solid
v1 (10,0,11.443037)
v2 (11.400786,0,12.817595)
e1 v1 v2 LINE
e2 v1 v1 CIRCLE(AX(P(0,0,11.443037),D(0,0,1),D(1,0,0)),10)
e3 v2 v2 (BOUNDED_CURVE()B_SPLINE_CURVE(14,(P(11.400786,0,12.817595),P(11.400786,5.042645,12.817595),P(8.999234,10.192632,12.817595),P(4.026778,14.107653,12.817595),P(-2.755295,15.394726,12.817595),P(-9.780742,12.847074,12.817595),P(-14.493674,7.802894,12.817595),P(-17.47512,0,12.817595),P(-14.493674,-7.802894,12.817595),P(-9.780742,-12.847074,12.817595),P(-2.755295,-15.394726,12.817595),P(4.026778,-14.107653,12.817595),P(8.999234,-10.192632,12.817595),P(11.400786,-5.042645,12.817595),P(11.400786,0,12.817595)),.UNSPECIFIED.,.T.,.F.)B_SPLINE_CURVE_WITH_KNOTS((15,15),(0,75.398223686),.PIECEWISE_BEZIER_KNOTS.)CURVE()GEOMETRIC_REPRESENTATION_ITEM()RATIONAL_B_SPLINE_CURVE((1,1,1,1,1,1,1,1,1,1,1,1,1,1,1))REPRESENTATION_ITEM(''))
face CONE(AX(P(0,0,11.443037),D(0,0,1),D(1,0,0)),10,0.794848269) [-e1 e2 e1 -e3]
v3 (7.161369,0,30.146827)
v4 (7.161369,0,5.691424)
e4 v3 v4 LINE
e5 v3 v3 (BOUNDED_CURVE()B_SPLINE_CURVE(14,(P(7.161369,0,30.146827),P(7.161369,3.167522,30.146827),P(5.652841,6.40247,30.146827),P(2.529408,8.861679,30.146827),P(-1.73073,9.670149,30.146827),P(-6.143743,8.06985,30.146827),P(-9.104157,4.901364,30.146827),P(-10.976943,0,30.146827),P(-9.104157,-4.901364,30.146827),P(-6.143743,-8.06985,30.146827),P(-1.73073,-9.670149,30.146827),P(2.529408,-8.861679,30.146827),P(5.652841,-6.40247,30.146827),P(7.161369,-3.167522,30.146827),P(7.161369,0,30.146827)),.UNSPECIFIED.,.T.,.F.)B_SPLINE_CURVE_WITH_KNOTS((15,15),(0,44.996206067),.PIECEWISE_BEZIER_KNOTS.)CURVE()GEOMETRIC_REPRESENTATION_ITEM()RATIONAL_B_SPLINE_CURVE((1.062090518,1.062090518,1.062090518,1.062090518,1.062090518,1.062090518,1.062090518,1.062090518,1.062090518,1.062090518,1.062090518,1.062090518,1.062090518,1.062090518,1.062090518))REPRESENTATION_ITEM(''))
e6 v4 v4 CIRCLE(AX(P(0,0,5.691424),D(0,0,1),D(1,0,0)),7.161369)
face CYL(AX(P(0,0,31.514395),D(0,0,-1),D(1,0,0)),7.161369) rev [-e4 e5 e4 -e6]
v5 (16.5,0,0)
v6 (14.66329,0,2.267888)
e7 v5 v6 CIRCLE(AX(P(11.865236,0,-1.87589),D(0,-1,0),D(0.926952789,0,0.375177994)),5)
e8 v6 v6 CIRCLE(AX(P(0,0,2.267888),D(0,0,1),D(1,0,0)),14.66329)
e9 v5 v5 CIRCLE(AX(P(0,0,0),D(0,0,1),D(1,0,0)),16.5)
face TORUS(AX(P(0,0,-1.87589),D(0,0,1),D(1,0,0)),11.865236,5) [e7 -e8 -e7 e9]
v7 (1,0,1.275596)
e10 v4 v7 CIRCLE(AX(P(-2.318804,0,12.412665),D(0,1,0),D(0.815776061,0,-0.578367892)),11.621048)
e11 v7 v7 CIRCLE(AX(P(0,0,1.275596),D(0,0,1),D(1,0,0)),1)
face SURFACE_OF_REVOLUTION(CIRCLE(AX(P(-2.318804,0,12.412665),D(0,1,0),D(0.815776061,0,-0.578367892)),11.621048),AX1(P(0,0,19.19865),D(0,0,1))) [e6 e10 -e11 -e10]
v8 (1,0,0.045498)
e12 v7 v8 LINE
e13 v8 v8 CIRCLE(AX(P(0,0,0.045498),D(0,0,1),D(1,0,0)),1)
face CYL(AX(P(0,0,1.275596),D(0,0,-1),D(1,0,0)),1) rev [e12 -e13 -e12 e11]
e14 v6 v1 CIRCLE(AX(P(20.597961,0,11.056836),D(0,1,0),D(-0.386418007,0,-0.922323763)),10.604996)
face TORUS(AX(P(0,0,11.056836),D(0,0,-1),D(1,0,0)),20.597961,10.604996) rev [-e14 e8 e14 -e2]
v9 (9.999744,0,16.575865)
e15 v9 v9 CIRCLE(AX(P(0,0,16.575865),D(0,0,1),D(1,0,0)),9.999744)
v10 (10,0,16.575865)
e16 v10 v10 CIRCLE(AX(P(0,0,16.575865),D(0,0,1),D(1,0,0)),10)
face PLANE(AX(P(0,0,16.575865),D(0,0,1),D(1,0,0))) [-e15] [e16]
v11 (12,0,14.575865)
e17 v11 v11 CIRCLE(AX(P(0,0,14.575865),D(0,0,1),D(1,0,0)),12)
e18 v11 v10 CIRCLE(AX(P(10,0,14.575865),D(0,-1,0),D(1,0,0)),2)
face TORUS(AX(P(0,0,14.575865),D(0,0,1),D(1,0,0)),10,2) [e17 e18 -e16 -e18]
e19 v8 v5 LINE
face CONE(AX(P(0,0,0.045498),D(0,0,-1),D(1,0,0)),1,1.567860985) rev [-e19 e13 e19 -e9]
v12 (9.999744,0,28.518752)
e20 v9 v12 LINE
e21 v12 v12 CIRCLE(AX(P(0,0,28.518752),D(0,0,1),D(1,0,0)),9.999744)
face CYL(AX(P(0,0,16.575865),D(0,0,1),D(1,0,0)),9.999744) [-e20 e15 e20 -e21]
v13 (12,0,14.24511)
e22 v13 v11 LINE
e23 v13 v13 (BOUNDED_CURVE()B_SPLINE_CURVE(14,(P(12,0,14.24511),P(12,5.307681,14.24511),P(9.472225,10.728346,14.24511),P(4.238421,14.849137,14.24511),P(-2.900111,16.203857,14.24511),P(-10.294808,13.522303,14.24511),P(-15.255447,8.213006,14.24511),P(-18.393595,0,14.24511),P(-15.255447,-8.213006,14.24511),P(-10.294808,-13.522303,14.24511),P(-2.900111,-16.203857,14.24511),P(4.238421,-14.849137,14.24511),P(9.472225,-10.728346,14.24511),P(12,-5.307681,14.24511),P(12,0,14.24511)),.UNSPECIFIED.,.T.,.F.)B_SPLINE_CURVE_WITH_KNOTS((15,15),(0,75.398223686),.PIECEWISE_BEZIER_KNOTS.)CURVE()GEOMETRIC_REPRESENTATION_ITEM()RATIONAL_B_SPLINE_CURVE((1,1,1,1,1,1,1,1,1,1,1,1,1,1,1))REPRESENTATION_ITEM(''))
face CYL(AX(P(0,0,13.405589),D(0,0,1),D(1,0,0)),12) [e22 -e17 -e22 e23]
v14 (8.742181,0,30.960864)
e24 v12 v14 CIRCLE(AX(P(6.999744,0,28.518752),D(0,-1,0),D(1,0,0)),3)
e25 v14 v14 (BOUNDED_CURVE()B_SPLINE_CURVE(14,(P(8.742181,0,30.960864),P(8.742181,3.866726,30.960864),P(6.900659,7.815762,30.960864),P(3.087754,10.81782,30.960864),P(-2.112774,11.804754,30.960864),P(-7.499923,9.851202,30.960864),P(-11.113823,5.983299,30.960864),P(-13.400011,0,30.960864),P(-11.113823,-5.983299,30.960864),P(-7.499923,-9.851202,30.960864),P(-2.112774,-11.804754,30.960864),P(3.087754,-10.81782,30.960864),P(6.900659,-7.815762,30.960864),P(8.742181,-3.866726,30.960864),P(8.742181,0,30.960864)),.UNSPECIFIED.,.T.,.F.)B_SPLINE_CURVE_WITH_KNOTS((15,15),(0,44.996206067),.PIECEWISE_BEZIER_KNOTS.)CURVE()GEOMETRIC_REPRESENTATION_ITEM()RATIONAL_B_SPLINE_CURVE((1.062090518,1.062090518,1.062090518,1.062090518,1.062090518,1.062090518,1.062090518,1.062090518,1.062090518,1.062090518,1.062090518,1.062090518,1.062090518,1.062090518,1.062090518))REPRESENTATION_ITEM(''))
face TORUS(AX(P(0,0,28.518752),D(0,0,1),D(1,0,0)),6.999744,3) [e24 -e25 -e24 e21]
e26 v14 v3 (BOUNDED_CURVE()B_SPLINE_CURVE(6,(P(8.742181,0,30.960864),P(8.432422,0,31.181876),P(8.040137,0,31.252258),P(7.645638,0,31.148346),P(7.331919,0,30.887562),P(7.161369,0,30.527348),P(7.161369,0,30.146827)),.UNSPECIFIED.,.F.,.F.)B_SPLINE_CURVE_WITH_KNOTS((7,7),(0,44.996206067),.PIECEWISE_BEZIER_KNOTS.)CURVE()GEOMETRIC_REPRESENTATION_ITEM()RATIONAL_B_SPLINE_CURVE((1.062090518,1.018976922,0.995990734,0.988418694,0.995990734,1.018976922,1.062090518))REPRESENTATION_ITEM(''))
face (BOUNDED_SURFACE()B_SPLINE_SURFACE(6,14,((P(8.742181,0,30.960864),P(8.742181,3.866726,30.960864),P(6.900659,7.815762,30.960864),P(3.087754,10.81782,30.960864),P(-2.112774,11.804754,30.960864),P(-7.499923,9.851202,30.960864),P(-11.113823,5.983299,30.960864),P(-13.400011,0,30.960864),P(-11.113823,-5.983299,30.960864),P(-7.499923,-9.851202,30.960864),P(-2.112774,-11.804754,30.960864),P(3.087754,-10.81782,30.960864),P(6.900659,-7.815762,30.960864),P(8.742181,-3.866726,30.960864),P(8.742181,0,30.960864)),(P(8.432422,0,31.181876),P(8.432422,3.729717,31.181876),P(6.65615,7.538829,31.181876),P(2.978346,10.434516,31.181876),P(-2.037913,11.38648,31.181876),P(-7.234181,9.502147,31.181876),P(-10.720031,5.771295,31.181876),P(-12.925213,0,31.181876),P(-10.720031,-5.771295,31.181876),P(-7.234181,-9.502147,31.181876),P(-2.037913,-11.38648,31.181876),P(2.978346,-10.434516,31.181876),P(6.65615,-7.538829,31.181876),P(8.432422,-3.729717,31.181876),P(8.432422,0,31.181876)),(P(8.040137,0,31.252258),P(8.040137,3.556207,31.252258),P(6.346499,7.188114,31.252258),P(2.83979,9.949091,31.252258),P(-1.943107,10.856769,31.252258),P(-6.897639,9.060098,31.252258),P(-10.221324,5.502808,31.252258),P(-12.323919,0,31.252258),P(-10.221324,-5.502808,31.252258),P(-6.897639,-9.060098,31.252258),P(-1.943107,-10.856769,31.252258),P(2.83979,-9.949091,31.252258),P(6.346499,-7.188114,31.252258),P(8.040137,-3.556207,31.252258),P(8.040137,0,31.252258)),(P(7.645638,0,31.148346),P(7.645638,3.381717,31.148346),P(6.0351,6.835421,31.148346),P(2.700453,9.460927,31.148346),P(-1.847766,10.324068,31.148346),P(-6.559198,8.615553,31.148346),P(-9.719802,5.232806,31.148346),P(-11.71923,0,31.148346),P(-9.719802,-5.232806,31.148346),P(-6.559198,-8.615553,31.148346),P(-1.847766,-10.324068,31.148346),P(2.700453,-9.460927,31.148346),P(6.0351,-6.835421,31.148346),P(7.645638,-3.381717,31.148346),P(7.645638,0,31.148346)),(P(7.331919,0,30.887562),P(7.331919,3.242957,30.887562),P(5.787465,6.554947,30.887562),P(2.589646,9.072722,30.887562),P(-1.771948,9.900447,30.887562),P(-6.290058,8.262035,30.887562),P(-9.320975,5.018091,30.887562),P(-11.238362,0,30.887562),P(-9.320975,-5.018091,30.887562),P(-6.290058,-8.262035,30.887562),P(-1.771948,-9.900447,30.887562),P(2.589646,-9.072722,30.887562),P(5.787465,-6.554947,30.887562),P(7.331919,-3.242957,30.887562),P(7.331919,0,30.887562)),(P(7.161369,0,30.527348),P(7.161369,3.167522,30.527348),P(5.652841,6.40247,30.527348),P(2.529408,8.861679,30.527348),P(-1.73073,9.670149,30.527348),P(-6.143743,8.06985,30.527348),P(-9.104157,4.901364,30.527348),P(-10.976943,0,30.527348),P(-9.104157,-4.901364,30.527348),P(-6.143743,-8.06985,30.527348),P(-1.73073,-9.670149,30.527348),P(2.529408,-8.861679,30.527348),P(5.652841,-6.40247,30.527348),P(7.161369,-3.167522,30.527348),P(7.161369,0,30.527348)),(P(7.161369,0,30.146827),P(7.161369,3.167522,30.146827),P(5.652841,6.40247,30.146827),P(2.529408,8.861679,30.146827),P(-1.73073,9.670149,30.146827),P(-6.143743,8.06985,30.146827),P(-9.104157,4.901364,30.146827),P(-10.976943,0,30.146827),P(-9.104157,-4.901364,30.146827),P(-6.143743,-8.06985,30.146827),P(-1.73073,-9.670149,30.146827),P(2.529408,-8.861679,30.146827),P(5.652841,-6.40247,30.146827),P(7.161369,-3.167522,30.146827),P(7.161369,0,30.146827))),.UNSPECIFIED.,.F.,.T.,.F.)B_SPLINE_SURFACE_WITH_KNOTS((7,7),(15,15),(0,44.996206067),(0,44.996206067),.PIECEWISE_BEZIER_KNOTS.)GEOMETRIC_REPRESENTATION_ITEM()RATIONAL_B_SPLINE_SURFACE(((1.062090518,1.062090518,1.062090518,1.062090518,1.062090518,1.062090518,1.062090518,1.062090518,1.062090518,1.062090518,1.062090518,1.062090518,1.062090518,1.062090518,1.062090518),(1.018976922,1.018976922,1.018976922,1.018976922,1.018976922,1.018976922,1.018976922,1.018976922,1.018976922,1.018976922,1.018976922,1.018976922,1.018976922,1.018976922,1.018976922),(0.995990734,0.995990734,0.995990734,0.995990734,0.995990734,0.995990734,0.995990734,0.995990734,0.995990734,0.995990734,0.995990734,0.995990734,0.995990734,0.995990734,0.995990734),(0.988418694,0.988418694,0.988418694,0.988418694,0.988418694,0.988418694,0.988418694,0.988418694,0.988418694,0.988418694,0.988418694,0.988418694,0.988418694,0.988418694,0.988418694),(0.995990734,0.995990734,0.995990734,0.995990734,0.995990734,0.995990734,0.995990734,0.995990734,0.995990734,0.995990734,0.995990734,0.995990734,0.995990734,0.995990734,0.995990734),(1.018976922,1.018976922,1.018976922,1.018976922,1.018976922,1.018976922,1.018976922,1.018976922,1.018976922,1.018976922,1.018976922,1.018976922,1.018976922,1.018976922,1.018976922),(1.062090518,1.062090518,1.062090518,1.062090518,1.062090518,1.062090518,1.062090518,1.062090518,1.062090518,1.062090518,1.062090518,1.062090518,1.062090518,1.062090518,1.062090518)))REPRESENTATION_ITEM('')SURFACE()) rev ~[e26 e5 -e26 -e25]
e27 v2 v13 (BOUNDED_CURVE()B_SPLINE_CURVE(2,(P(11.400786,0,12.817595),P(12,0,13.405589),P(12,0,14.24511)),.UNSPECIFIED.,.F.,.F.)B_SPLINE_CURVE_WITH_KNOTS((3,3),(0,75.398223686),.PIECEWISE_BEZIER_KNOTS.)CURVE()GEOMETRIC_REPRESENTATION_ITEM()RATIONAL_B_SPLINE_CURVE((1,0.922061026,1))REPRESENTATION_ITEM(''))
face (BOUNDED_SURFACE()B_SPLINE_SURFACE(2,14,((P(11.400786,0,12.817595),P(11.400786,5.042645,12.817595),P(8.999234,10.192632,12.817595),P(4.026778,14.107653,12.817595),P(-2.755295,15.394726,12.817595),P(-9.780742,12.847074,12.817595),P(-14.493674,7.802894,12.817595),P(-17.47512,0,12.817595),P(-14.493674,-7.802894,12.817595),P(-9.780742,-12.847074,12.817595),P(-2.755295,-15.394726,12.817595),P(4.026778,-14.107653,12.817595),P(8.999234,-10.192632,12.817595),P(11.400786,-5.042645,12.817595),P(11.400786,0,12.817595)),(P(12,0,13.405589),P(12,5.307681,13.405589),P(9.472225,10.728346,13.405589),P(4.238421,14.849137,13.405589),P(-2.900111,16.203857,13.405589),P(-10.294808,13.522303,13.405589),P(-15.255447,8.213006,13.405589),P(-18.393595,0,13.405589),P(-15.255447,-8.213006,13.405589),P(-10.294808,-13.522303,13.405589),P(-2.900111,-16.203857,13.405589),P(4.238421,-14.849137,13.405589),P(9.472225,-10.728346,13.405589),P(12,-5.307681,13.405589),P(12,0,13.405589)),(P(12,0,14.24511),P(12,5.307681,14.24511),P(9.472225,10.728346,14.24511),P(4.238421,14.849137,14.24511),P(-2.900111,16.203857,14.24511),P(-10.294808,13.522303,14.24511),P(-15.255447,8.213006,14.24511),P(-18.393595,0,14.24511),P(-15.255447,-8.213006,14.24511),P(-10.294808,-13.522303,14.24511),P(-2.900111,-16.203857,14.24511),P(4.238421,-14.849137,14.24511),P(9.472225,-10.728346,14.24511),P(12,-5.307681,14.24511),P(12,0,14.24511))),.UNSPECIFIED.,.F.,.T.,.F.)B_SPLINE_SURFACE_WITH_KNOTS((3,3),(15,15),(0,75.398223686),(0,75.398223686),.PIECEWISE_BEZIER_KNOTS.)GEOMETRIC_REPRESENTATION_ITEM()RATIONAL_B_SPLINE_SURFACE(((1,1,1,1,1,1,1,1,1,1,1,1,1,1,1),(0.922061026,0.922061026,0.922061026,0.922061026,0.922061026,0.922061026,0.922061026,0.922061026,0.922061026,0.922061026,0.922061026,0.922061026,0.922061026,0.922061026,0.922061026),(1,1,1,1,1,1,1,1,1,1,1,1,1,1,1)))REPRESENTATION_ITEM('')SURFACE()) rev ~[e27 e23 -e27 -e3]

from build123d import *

# Parameters (mm, degrees)
F3_R = 2
F4_R = 2
F6_R = 1


# Not quite as in the source:
# - a fillet or chamfer that OpenCascade refuses, or shapes differently, is made with other operations: its cross-section is extruded or revolved along the edge and cut away or added


with BuildPart() as f1:
    # F0 (on Front) → F1 (revolve)
    with BuildSketch(Plane.XZ):
        with BuildLine():
            ThreePointArc((16.5, 1.2755964417), (11.6628201448, 5.344639677), (10, 11.4430370868))
            Line((10, 11.4430370868), (12, 13.4055894333))
            Line((12, 13.4055894333), (12, 16.5758651609))
            Line((12, 16.5758651609), (9.9997436628, 16.5758651609))
            Line((9.9997436628, 16.5758651609), (9.9997436628, 31.5143950284))
            Line((9.9997436628, 31.5143950284), (7.1613686159, 31.5143950284))
            Line((7.1613686159, 31.5143950284), (7.1613686159, 5.6914240122))
            ThreePointArc((7.1613686159, 5.6914240122), (4.4508587391, 2.967008827), (1, 1.2755964417))
            Line((1, 1.2755964417), (1, 0.0454979338))
            Line((1, 0.0454979338), (16.5, 0))
            Line((16.5, 0), (16.5, 1.2755964417))
        make_face()
    revolve(axis=Axis((0, 0, 19.1986504942), (0, 0, 1)))

    # F2: fillet of radius 5 on 1 edges, made by hand

    # F2_s1 → F2_t2 (revolve, cut)
    with BuildSketch(Plane.XZ):
        with BuildLine():
            ThreePointArc((16.5, 0), (15.750789479, 1.2709297875), (14.6632904097, 2.2678875116))
            ThreePointArc((14.6632904097, 2.2678875116), (15.557168946, 1.7264369439), (16.5, 1.2755964417))
            Line((16.5, 1.2755964417), (16.5, 0))
        make_face()
    revolve(axis=Axis((0, 0, 1.2755964417), (0, 0, 1)), mode=Mode.SUBTRACT)

    # F3
    f3_edges = [f1.edges().sort_by_distance(p)[0] for p in [
        (-12, 0, 13.405589),
    ]]
    fillet(f3_edges, radius=F3_R)

    # F4
    f4_edges = [f1.edges().sort_by_distance(p)[0] for p in [
        (-12, 0, 16.575865),
    ]]
    fillet(f4_edges, radius=F4_R)

    # F5: fillet of radius 3 on 1 edges, made by hand

    # F5_s1 → F5_t2 (revolve, cut)
    with BuildSketch(Plane.XZ):
        with BuildLine():
            ThreePointArc((9.9997436628, 28.5187519631), (9.1774574708, 30.5821381534), (7.1613686159, 31.5143950284))
            Line((7.1613686159, 31.5143950284), (9.9997436628, 31.5143950284))
            Line((9.9997436628, 31.5143950284), (9.9997436628, 28.5187519631))
        make_face()
    revolve(axis=Axis((0, 0, 31.5143950284), (0, 0, 1)), mode=Mode.SUBTRACT)

    # F6
    f6_edges = [f1.edges().sort_by_distance(p)[0] for p in [
        (-7.161369, 0, 31.514395),
    ]]
    fillet(f6_edges, radius=F6_R)


solid = f1.part
